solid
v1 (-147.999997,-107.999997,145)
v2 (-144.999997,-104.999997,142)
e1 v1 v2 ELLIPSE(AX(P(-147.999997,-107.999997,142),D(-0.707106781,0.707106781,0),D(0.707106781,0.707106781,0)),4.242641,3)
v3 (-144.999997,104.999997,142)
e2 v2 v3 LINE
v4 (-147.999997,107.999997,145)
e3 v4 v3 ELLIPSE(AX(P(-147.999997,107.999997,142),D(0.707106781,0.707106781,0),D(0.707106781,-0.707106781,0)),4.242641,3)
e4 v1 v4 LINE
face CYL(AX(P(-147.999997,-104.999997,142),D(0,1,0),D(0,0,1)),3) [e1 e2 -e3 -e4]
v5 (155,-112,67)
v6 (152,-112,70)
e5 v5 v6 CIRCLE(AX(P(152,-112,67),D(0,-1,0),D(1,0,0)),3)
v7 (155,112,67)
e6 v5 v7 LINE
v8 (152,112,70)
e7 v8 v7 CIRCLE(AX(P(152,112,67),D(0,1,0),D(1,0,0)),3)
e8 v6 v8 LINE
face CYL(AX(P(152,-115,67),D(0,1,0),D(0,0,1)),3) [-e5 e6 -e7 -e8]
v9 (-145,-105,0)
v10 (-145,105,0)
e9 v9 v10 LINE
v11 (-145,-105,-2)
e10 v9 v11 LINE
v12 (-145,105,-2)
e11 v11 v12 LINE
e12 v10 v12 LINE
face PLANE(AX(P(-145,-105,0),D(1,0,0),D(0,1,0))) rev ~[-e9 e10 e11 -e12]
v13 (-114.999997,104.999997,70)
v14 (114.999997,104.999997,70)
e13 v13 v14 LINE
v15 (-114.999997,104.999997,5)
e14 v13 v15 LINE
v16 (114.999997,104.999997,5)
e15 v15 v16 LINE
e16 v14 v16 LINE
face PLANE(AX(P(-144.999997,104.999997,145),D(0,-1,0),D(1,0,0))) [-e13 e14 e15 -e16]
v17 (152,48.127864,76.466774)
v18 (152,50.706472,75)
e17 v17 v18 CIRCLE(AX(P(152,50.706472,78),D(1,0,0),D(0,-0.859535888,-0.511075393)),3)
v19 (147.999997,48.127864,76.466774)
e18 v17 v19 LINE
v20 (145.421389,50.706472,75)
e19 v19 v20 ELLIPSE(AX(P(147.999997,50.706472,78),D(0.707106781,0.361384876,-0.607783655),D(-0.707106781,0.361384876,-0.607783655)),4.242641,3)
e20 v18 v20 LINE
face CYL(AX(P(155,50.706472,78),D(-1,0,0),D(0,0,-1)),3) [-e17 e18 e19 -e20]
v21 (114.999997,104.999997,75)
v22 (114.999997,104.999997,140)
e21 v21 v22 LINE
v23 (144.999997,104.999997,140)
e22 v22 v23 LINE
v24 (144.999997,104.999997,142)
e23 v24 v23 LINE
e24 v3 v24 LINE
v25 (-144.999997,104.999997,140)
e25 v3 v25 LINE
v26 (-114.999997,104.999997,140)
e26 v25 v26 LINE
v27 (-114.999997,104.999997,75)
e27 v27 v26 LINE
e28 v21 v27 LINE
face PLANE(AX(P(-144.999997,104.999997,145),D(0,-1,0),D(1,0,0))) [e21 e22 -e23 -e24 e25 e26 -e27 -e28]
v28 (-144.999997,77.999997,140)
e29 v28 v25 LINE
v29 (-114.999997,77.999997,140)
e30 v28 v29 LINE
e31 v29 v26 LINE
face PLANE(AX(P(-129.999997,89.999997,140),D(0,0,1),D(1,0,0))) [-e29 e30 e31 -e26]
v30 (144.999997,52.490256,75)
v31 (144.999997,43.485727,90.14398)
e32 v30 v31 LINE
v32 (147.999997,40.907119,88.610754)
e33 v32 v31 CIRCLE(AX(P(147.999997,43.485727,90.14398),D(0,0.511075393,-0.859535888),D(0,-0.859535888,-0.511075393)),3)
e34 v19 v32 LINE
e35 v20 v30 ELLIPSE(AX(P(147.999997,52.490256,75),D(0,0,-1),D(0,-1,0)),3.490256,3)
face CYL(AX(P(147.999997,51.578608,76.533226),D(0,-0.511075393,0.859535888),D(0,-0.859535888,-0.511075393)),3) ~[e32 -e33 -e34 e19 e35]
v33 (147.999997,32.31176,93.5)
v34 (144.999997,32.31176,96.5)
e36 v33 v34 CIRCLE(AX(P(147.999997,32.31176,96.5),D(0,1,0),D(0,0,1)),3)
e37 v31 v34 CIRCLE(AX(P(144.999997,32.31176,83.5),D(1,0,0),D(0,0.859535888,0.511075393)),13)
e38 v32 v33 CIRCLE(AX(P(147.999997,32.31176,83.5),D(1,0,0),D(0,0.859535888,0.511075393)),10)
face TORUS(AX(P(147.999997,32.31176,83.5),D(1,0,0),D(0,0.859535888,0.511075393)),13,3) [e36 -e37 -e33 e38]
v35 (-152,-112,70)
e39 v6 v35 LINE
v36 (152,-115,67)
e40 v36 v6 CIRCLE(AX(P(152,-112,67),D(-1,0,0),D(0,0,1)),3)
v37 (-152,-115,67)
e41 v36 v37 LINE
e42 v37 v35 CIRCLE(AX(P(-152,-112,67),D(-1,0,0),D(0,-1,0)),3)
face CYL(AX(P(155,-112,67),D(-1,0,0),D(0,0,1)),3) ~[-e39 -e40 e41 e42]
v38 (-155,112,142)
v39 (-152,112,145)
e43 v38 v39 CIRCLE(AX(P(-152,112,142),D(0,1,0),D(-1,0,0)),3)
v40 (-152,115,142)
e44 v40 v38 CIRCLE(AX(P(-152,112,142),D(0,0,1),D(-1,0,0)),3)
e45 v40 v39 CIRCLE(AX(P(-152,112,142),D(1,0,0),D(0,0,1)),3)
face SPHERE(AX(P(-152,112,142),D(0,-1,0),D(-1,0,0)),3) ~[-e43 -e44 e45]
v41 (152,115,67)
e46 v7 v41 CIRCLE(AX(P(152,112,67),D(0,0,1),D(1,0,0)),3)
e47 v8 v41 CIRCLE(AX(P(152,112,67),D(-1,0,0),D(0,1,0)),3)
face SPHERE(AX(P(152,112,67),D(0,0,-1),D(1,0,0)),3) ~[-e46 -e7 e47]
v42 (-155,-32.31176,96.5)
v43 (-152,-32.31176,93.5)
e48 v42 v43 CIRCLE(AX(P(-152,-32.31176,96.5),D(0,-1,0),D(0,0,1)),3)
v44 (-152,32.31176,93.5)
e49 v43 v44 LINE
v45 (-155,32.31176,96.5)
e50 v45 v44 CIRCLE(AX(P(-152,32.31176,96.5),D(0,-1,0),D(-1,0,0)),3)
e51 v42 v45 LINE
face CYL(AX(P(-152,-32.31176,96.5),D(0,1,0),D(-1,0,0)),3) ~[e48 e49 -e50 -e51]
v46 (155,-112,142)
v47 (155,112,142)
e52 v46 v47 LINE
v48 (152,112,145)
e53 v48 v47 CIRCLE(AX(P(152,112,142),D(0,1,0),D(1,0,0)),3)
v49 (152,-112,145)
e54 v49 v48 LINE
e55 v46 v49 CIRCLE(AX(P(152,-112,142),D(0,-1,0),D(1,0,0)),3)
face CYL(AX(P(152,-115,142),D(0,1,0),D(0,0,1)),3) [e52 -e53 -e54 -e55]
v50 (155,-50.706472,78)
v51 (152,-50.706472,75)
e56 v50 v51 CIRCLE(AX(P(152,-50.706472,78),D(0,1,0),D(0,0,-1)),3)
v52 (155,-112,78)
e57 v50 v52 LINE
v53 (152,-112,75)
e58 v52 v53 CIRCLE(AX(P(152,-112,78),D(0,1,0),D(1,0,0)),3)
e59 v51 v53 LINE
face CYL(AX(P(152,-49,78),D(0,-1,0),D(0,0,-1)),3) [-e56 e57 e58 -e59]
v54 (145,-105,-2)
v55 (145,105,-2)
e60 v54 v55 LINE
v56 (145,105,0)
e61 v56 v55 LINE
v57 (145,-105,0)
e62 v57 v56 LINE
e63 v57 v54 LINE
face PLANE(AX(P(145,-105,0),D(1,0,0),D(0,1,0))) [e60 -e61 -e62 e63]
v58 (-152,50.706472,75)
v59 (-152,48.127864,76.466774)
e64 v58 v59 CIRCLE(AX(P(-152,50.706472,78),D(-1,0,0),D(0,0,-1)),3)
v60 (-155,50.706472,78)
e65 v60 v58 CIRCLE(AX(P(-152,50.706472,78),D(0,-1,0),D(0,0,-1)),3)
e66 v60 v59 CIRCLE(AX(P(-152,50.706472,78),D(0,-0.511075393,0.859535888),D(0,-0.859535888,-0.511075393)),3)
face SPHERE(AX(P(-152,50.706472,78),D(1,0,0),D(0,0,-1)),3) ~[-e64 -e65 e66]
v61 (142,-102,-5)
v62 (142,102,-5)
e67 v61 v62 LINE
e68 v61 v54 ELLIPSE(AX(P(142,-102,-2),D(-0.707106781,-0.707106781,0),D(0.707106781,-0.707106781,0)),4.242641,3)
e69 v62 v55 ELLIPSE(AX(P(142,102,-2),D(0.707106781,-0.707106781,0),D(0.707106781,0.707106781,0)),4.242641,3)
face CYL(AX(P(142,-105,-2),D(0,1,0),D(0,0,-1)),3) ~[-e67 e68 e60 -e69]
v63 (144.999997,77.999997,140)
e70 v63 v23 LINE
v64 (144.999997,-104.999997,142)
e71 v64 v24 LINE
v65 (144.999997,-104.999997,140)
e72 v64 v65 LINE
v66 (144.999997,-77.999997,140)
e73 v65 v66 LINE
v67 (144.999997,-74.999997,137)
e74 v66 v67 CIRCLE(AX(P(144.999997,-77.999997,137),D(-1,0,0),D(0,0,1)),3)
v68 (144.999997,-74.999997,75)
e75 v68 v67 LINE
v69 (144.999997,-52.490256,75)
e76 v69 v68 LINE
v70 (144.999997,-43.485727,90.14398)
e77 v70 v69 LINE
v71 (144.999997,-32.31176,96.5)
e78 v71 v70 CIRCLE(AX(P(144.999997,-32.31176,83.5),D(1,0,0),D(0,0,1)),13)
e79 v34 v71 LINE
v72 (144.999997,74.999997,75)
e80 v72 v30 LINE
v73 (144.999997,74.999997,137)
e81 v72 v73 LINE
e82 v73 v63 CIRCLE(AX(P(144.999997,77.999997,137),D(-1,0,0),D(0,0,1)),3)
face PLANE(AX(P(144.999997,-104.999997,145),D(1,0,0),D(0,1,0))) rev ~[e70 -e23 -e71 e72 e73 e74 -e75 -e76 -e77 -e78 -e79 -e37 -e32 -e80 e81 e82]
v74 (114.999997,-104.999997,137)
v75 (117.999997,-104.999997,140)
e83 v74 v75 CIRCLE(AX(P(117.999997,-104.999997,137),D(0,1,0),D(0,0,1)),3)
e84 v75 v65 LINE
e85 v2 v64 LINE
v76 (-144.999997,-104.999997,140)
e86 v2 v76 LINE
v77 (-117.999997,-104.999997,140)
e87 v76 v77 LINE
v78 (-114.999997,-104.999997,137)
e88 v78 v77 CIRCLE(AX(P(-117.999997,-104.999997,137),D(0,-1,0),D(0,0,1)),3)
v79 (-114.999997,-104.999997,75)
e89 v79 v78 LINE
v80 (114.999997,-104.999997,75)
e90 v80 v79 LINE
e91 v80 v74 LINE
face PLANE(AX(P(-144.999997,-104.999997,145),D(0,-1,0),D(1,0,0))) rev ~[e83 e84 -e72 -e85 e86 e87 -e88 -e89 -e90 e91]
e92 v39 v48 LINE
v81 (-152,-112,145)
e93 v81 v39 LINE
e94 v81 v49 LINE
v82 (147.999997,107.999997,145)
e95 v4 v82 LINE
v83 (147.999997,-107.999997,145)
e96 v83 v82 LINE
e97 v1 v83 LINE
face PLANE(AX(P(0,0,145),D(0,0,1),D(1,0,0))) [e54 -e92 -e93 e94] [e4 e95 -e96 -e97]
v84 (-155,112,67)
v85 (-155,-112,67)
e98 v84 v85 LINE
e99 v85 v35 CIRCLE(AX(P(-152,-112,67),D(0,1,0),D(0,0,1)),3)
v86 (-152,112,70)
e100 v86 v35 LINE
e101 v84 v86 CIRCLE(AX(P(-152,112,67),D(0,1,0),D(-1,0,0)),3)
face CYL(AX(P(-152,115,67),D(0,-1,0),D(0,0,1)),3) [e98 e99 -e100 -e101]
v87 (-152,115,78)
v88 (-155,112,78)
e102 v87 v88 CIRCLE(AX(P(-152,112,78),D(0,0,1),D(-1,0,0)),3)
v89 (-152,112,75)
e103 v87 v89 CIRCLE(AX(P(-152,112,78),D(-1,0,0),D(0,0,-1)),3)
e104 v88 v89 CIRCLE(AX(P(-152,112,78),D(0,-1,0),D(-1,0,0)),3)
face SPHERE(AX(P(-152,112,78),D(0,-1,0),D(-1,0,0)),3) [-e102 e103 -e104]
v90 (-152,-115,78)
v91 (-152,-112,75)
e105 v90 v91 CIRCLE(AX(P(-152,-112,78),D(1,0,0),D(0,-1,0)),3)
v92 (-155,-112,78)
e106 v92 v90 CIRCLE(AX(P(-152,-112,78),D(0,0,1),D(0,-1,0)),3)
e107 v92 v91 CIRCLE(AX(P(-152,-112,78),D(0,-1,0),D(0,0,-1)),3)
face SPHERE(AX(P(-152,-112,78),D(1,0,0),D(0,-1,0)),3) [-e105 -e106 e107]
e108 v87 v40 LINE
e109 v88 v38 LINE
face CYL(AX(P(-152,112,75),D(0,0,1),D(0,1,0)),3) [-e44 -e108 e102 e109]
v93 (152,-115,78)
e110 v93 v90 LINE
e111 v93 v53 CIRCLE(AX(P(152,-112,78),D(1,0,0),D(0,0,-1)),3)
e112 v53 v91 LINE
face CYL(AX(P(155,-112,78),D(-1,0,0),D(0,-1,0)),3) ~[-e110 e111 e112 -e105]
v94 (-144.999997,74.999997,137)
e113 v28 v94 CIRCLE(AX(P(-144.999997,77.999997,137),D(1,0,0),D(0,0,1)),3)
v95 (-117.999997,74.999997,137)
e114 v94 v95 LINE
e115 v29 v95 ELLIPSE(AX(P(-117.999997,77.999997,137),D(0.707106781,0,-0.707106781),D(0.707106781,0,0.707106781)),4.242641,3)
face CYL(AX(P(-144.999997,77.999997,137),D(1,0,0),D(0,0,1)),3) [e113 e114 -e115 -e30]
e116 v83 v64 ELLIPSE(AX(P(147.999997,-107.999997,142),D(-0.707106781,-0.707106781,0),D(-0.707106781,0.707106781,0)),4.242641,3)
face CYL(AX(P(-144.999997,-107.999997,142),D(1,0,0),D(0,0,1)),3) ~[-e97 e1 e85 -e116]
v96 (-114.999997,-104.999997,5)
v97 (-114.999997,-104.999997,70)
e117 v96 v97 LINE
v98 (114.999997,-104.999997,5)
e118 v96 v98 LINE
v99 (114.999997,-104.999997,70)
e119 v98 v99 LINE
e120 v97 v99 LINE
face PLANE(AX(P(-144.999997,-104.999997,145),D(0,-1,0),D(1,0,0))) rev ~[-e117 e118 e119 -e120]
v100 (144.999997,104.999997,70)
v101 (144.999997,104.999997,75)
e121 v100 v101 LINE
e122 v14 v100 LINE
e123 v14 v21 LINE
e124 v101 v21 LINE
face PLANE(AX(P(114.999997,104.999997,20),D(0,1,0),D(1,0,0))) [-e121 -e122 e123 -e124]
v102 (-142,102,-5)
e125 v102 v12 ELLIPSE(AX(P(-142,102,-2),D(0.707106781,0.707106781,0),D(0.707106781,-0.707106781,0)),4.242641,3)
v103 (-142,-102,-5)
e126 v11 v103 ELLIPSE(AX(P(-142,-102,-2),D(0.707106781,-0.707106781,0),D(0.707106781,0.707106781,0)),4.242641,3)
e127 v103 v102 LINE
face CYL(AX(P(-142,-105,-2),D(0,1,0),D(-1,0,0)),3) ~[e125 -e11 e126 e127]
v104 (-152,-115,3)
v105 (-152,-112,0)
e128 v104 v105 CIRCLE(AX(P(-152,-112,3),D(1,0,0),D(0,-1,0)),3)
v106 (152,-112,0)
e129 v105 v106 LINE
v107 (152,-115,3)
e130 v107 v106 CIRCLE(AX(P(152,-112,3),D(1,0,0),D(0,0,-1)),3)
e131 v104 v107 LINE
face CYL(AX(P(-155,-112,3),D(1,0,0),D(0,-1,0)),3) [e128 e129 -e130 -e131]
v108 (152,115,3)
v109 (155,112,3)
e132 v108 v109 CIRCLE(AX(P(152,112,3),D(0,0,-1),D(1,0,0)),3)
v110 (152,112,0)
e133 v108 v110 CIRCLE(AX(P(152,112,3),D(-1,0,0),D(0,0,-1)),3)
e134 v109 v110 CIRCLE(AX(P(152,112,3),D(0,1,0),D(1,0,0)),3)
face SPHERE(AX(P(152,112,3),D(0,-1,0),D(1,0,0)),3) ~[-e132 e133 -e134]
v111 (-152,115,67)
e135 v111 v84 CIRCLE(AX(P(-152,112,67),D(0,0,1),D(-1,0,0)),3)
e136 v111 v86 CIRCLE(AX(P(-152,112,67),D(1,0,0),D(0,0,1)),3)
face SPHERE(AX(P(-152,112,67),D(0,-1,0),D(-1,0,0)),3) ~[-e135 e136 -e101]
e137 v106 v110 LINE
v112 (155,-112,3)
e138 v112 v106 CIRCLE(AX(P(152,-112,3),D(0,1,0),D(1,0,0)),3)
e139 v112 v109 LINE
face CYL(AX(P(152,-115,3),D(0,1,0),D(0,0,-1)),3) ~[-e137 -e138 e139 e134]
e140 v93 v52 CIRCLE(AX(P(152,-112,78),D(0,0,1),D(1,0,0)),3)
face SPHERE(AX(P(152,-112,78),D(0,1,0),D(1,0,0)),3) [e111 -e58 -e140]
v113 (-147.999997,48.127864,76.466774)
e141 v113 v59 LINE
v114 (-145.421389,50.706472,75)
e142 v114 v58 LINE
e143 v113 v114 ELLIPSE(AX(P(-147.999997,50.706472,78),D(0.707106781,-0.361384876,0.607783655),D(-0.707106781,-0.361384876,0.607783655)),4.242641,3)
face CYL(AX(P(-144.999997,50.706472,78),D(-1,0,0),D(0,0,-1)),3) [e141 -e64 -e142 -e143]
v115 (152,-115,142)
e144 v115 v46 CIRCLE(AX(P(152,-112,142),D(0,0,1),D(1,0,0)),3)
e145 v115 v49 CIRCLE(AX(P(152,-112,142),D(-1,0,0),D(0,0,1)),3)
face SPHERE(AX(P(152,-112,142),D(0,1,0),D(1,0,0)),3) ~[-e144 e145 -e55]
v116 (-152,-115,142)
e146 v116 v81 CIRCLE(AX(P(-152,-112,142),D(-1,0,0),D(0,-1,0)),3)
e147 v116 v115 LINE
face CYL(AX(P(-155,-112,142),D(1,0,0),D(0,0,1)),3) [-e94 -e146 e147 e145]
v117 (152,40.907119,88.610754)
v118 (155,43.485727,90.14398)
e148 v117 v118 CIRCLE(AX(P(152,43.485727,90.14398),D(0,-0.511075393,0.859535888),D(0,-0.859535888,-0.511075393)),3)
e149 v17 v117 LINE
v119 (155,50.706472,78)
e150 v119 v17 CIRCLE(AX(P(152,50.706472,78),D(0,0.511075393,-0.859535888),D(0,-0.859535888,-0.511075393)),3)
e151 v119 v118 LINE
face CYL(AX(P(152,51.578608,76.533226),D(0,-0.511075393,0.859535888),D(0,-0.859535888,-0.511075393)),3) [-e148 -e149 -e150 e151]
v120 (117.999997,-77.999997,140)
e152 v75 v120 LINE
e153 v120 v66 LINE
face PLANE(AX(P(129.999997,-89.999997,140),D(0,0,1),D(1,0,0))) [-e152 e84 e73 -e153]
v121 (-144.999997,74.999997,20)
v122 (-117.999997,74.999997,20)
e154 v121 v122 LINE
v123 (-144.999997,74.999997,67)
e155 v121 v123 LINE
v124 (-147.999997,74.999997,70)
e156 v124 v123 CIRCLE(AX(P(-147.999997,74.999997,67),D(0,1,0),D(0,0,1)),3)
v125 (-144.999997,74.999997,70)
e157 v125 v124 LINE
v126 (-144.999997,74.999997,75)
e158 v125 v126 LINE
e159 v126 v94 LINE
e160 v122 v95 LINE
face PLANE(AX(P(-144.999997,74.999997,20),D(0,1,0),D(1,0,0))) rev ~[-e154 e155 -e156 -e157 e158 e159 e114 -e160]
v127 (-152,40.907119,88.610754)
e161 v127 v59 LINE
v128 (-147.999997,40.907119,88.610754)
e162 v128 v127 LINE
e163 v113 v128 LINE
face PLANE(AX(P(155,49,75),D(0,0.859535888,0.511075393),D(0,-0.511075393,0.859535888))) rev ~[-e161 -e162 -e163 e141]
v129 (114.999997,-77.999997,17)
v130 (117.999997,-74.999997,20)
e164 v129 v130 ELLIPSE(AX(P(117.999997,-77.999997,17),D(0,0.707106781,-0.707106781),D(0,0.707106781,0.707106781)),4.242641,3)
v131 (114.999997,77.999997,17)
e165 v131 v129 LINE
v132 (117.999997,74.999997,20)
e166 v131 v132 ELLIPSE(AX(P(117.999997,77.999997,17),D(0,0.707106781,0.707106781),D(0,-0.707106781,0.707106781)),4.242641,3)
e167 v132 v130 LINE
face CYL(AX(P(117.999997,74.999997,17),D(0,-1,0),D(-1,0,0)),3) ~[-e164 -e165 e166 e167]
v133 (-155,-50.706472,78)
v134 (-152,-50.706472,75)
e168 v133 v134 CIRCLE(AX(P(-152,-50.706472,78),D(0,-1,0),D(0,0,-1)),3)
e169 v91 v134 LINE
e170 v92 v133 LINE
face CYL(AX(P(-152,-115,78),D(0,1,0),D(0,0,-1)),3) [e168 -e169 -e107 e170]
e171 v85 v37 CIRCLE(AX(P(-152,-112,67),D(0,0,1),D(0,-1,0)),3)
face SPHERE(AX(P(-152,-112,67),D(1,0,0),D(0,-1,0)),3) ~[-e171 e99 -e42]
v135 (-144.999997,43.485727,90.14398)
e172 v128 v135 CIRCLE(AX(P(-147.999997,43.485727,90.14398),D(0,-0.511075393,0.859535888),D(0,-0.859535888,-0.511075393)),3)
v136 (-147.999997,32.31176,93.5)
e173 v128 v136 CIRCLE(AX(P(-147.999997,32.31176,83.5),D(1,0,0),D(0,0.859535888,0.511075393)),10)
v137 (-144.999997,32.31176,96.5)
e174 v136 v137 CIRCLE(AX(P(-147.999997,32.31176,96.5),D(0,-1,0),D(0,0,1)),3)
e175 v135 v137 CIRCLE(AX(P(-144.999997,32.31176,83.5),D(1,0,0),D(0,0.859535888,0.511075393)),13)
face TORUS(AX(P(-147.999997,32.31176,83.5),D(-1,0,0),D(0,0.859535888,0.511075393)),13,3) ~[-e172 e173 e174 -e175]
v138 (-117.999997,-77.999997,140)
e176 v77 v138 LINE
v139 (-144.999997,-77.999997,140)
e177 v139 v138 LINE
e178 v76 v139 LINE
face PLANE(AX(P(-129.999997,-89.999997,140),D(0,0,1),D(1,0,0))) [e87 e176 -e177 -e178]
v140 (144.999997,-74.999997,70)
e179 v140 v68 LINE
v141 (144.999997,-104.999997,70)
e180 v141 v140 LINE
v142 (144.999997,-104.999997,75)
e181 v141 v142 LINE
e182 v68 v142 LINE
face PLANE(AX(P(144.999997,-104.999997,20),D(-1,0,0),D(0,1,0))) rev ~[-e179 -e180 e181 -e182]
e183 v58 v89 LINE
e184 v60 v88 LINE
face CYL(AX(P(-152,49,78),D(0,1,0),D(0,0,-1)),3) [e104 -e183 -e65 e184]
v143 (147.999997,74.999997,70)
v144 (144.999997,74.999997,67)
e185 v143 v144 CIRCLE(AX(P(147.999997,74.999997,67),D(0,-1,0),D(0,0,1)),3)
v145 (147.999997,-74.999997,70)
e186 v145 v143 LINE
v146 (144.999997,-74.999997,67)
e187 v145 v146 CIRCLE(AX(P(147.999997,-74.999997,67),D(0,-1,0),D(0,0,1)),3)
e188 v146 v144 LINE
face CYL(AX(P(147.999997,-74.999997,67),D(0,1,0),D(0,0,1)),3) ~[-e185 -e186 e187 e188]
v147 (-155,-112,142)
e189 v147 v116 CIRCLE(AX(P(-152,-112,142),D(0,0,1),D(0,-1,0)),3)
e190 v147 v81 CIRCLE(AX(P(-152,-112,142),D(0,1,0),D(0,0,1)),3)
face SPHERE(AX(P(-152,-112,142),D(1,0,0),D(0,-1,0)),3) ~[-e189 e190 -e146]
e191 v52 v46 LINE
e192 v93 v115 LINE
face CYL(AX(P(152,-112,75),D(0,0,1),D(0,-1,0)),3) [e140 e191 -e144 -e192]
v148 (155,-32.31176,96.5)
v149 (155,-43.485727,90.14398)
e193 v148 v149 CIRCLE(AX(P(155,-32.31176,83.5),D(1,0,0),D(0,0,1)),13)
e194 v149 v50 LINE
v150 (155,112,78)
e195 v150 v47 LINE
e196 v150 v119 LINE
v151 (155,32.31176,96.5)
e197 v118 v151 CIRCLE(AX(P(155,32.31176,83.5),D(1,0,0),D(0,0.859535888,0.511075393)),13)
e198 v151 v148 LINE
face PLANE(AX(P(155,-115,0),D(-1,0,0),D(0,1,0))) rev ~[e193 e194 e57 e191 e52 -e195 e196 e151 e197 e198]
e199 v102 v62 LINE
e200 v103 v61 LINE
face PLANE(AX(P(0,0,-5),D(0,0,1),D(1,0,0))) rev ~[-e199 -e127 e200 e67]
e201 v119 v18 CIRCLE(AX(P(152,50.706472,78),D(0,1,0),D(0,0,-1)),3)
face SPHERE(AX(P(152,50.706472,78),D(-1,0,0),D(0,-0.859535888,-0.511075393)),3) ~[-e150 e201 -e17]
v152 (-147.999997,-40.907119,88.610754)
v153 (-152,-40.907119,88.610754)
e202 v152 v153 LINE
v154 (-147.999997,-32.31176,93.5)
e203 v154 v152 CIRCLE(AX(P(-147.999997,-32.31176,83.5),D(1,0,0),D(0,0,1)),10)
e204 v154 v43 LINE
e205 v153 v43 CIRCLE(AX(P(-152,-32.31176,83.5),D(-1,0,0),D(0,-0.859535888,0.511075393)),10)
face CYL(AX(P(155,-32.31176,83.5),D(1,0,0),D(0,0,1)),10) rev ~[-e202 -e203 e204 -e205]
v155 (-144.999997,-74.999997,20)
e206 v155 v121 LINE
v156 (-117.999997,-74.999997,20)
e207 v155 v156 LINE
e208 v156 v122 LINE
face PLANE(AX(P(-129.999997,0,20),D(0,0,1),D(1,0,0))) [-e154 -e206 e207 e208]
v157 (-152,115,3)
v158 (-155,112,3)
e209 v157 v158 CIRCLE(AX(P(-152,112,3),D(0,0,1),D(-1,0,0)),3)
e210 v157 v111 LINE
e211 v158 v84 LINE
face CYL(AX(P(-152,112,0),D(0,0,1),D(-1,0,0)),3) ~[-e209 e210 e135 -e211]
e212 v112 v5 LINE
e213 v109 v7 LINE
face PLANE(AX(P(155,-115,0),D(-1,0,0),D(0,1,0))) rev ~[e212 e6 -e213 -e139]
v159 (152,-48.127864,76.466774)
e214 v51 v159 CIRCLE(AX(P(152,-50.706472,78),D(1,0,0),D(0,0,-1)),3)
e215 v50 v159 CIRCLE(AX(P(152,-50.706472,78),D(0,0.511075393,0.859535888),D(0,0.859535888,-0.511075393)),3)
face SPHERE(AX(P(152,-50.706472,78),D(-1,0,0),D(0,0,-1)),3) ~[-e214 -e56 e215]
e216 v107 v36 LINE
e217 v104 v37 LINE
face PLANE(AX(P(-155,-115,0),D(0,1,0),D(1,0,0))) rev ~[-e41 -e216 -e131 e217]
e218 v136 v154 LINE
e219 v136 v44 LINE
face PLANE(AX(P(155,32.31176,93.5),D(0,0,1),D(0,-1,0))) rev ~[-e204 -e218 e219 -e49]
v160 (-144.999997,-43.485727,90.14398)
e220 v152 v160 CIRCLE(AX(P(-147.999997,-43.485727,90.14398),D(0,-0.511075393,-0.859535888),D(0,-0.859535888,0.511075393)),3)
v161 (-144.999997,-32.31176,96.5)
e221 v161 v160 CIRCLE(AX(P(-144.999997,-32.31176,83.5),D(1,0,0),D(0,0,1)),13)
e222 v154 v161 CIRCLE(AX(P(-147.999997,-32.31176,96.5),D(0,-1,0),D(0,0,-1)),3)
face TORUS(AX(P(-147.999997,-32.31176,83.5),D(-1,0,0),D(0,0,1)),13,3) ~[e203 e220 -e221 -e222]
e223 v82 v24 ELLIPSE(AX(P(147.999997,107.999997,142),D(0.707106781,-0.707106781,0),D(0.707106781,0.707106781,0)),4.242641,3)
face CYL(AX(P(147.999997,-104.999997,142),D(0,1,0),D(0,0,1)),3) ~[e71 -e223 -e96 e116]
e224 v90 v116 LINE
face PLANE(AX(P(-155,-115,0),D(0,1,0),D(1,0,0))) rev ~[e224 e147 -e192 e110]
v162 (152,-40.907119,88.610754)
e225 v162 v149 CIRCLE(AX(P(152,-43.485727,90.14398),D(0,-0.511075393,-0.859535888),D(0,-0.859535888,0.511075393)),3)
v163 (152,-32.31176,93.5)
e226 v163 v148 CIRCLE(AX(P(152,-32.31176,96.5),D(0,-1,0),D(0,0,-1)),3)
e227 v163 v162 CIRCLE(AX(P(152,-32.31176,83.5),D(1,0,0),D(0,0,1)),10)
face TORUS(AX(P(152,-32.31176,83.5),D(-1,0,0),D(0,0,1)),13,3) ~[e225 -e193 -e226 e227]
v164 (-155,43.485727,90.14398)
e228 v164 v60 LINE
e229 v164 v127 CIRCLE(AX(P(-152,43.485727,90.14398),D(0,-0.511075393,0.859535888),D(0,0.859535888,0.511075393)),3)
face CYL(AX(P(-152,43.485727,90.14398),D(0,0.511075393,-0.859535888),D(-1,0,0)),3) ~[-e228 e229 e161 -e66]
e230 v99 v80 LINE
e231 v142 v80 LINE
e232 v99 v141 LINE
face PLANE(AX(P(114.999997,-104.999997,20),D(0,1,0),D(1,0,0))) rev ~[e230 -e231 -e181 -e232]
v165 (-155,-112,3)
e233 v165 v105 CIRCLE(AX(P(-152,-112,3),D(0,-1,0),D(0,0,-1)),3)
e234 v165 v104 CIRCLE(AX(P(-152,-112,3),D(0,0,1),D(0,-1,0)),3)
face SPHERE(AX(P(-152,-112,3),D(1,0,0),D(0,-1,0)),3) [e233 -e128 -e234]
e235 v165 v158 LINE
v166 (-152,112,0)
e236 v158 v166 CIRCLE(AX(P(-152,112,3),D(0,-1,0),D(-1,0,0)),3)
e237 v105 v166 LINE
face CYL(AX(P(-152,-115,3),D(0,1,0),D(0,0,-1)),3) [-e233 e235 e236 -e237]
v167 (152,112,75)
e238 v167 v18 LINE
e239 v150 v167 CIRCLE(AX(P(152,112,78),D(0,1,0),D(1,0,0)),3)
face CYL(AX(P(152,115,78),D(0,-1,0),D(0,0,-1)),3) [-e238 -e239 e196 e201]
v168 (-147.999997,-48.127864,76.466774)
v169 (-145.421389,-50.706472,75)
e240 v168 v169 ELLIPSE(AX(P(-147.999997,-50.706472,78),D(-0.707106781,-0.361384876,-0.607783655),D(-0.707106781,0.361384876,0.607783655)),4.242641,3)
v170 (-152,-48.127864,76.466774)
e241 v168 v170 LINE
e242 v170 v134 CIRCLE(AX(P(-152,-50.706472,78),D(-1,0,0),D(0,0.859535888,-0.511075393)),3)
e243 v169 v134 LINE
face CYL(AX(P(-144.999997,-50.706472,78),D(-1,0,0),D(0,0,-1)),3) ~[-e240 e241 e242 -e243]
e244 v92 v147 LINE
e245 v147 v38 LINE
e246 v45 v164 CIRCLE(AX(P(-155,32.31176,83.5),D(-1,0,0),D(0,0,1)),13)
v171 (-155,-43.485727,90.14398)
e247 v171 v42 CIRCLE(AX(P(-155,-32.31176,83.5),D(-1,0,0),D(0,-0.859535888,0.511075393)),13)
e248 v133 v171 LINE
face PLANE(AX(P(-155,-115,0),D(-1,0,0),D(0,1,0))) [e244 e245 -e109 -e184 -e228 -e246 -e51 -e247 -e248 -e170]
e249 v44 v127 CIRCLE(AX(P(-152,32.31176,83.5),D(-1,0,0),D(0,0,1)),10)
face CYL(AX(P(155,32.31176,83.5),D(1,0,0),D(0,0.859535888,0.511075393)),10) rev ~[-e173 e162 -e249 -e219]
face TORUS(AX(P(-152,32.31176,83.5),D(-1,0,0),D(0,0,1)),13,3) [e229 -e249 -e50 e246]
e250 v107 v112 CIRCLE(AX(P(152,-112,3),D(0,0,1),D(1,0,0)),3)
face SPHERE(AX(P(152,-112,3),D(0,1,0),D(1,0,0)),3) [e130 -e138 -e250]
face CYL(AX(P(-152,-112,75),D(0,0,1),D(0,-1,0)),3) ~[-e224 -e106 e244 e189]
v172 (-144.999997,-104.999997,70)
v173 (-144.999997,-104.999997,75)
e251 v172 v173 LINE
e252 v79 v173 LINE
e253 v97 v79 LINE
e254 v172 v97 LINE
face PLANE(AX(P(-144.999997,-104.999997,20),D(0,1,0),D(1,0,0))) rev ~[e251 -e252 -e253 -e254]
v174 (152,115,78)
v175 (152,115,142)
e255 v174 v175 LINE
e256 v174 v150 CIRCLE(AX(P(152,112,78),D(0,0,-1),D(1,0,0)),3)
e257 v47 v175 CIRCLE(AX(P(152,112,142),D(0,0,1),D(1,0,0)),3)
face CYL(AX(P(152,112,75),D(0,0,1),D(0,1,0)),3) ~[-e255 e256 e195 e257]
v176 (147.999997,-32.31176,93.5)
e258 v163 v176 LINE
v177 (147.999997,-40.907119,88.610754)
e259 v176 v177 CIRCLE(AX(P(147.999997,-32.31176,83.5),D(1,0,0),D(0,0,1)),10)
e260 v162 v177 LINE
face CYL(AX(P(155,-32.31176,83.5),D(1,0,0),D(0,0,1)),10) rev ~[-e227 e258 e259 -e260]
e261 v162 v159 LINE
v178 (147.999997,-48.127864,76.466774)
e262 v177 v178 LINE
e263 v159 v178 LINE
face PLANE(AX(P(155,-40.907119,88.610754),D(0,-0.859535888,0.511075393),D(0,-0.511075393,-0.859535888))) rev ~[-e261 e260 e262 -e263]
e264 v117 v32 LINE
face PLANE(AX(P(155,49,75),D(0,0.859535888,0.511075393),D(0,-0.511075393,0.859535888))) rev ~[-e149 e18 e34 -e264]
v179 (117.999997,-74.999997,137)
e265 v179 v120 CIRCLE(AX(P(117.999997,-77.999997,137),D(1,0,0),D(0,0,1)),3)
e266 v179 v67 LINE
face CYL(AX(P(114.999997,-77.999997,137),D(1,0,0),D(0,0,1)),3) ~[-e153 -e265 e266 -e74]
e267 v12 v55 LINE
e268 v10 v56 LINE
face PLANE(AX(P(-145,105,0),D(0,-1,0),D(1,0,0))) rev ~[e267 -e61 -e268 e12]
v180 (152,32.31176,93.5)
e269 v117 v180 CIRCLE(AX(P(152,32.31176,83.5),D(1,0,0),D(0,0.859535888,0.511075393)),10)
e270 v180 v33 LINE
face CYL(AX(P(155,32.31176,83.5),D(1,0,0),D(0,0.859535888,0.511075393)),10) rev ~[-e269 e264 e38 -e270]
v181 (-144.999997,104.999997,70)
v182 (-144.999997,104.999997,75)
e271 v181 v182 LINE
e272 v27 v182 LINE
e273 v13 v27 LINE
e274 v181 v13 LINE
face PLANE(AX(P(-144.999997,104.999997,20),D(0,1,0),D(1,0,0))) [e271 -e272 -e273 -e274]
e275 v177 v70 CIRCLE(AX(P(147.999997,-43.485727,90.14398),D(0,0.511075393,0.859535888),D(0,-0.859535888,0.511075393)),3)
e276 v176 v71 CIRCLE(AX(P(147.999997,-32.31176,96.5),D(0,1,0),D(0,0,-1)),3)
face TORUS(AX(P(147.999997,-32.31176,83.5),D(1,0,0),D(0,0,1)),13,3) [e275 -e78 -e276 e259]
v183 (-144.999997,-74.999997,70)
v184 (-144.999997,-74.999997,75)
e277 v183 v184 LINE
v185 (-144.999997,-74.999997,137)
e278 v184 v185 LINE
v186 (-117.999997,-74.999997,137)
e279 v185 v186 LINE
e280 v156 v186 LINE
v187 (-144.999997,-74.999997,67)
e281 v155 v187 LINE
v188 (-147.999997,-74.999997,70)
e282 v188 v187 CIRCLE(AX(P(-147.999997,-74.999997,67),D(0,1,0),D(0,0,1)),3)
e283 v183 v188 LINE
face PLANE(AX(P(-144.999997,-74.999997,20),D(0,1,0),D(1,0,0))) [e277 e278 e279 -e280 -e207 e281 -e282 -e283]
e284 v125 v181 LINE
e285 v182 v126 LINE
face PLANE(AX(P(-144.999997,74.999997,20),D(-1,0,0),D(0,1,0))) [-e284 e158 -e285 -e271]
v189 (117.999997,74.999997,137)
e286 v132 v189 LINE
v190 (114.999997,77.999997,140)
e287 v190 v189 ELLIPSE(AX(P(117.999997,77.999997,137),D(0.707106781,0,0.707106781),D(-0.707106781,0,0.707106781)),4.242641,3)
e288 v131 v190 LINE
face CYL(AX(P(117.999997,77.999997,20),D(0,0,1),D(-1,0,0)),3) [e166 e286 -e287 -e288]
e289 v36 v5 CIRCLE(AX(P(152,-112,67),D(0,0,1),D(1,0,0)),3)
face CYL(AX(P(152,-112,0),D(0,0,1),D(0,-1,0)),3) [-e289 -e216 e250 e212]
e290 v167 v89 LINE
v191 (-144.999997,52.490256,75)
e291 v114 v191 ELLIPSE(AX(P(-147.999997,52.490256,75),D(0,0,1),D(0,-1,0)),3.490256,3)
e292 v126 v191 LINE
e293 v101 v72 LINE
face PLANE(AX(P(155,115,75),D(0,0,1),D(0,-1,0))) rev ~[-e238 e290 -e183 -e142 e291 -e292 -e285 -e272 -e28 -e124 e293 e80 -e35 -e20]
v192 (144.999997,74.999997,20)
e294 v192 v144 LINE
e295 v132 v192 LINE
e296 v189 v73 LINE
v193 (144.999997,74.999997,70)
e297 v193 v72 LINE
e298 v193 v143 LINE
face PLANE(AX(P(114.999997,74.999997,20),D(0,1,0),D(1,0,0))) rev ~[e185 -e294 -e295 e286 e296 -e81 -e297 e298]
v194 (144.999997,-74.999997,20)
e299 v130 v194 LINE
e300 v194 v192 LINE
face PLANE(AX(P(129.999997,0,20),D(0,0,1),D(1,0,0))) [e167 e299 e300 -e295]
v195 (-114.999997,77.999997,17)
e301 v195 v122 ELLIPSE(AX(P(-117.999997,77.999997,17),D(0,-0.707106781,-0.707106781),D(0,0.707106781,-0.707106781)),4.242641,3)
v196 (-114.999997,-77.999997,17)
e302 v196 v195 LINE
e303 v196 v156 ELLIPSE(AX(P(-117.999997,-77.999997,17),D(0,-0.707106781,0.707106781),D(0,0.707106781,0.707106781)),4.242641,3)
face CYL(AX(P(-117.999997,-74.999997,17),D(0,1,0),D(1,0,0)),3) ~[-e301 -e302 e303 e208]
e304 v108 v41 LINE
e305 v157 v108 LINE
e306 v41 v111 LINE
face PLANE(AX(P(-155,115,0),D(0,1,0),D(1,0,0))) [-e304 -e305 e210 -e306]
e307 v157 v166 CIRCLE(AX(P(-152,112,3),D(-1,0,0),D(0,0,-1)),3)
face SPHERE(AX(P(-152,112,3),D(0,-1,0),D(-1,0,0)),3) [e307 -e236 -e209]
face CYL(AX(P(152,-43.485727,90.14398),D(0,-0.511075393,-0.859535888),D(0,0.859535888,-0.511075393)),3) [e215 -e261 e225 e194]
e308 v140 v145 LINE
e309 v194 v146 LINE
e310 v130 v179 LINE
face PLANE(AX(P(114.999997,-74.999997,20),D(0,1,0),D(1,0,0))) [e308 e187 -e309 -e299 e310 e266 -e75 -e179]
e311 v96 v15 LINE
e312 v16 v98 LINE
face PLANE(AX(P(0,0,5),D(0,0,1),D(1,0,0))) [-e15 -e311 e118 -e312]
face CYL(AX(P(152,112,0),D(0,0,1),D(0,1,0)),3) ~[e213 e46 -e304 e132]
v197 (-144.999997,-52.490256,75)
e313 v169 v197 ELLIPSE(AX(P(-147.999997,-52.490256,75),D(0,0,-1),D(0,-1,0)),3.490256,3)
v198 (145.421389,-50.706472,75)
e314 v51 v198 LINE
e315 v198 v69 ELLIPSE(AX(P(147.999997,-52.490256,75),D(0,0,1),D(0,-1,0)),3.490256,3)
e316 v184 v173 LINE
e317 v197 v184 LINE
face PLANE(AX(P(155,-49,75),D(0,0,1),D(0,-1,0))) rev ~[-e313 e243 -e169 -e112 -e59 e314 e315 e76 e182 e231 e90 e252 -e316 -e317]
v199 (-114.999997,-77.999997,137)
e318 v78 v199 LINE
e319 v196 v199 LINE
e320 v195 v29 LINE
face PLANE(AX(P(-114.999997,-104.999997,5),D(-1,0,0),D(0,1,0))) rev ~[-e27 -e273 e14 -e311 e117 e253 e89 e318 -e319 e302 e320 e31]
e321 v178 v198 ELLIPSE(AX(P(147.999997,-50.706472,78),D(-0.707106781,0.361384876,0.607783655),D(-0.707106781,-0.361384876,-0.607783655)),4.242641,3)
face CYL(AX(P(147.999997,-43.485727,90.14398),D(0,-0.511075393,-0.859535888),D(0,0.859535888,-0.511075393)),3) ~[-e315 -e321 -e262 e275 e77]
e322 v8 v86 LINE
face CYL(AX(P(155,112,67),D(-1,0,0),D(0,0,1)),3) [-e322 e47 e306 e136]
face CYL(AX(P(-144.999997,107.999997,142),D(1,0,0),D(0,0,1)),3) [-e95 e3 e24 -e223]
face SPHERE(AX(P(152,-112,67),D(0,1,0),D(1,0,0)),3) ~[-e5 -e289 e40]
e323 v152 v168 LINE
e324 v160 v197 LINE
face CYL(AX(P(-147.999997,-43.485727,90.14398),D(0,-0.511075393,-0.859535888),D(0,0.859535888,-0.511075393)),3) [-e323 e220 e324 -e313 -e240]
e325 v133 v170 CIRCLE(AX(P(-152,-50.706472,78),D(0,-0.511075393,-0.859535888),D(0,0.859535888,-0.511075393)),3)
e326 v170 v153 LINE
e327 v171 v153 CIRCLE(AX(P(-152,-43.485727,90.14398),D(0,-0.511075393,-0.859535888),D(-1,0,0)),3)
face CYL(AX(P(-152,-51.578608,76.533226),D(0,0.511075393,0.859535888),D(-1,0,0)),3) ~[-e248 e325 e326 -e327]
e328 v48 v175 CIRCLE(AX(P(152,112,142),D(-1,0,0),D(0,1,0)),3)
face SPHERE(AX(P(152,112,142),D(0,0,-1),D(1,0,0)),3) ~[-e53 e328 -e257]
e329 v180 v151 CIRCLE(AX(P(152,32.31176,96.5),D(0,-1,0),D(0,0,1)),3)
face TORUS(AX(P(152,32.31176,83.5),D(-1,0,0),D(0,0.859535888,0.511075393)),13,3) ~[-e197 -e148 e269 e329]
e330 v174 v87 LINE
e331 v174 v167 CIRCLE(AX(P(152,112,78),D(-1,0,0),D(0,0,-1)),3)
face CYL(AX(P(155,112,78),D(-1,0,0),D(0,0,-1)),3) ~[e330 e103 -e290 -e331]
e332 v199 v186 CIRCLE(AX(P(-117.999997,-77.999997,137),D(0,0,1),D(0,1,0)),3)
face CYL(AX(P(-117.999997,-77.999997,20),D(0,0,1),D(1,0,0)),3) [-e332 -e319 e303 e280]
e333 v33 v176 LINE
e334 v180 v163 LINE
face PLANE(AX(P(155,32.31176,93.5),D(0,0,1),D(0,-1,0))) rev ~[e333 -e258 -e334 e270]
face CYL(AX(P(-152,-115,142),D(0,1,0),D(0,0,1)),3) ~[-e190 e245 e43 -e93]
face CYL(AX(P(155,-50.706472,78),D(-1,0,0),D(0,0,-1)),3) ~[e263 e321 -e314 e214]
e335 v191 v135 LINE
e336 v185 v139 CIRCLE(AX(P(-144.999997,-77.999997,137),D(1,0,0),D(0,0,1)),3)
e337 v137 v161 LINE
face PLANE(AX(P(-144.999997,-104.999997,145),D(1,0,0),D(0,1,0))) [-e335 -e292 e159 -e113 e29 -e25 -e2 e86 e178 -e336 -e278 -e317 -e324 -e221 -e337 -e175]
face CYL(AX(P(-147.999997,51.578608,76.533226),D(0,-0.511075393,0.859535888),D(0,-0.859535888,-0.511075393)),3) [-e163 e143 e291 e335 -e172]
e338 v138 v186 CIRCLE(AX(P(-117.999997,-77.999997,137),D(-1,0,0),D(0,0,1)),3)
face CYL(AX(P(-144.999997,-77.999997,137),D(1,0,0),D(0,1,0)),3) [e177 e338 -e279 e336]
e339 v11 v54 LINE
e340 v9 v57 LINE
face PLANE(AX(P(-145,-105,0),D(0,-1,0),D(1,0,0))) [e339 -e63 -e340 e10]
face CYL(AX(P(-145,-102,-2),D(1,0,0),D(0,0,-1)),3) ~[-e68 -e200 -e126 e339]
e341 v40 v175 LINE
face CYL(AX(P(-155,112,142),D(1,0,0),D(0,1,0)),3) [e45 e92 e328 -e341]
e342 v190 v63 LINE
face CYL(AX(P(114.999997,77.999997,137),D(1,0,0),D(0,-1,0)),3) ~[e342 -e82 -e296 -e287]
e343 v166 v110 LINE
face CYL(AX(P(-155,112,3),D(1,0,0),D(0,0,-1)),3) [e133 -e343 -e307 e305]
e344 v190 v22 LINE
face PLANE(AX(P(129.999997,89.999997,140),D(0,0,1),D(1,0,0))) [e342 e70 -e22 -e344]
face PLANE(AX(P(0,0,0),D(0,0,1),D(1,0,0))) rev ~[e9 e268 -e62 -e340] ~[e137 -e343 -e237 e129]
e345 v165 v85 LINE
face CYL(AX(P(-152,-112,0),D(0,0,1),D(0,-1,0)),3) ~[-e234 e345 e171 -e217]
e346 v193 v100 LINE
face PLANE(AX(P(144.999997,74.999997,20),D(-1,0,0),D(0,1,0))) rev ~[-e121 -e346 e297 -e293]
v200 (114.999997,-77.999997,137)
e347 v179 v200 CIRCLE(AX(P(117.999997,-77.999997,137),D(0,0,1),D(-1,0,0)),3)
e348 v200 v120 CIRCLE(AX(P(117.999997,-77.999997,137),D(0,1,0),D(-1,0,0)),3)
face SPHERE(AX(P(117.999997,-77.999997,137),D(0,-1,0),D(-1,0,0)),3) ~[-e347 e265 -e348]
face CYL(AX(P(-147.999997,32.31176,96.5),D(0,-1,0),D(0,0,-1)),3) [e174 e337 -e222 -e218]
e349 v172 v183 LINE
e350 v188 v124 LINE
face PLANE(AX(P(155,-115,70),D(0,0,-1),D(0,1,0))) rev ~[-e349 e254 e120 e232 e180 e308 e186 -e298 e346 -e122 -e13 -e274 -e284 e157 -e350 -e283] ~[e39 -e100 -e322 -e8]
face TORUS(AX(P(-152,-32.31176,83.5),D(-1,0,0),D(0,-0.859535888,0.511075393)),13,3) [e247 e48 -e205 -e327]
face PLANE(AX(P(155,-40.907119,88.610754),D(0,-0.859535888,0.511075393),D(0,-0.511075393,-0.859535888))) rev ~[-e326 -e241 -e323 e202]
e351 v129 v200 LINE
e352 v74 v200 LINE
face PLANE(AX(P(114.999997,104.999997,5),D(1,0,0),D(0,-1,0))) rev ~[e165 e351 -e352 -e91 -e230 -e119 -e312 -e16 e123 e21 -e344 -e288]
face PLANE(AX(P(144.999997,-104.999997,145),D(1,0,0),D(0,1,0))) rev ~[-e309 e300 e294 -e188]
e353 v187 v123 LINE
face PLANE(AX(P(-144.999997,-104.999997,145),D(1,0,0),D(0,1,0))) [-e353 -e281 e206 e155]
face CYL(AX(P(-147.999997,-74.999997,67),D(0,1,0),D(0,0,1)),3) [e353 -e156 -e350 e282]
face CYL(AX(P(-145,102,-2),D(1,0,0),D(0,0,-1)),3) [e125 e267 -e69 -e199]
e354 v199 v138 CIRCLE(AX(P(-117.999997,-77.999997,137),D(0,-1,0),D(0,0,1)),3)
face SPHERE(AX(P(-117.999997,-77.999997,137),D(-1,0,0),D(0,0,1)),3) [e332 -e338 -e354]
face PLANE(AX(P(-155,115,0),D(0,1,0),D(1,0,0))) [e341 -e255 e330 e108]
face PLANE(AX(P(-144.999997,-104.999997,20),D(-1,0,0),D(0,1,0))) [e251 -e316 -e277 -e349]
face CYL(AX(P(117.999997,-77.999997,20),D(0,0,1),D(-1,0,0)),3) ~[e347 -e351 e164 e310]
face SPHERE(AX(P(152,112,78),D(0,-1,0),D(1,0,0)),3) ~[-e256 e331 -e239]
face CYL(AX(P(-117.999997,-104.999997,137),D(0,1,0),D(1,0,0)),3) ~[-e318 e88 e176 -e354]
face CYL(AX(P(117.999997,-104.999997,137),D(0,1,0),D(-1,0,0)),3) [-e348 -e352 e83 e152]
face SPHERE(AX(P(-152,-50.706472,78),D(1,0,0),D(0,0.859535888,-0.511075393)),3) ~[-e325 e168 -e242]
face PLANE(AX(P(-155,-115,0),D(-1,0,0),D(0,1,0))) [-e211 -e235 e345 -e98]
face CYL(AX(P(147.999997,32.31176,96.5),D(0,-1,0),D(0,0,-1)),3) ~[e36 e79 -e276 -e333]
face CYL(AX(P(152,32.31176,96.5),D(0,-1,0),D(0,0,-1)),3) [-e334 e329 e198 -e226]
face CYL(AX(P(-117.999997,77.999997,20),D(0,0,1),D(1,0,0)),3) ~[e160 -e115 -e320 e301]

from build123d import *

# Parameters (mm, degrees)
F0_W      = 310
F0_H      = 230
F2_DEPTH  = 145
F1_W      = 290
F1_H      = 210
F3_DEPTH  = 5
F4_W      = 289.9999934435
F4_H      = 209.9999934435
F5_DEPTH  = 140
F7_DEPTH  = 310.001
F9_START  = 15
F8_W      = 30
F8_H      = 30
F9_DEPTH  = 120
F10_W     = 30
F10_H     = 209.9999934435
F11_DEPTH = 15
F12_R     = 3


with BuildPart() as f2:
    # F0 (on Top) → F2 (new body)
    with BuildSketch(Plane.XY):
        Rectangle(F0_W, F0_H)
    extrude(amount=F2_DEPTH)

    # F1 (on face) → F3 (join)
    with BuildSketch(Plane.XY):
        Rectangle(F1_W, F1_H)
    extrude(amount=-F3_DEPTH)

    # F4 (on face) → F5 (cut)
    with BuildSketch(Plane.XY.offset(145)):
        Rectangle(F4_W, F4_H)
    extrude(amount=-F5_DEPTH, mode=Mode.SUBTRACT)

    # F6 (on face) → F7 (cut, through all)
    with BuildSketch(Plane.YZ.offset(155)):
        with BuildLine():
            Line((-49, 75), (-115, 75))
            Line((-115, 75), (-115, 70))
            Line((-115, 70), (115, 70))
            Line((115, 70), (115, 75))
            Line((115, 75), (49, 75))
            Line((49, 75), (40.9071192856, 88.6107539288))
            ThreePointArc((40.9071192856, 88.6107539288), (37.256073336, 92.1921671431), (32.3117604054, 93.5))
            Line((32.3117604054, 93.5), (-32.3117604054, 93.5))
            ThreePointArc((-32.3117604054, 93.5), (-37.256073336, 92.1921671431), (-40.9071192856, 88.6107539288))
            Line((-40.9071192856, 88.6107539288), (-49, 75))
        make_face()
    extrude(amount=-F7_DEPTH, mode=Mode.SUBTRACT)

    # F8 (on face) → F9 (join)
    with BuildSketch(Plane.XY.offset(5).offset(F9_START)):
        with Locations((-129.9999967217, 89.9999967217)):
            Rectangle(F8_W, F8_H)
        with Locations((129.9999967217, 89.9999967217)):
            Rectangle(F8_W, F8_H)
        with Locations((129.9999967217, -89.9999967217)):
            Rectangle(F8_W, F8_H)
        with Locations((-129.9999967217, -89.9999967217)):
            Rectangle(F8_W, F8_H)
    extrude(amount=F9_DEPTH)

    # F10 (on face) → F11 (join)
    with BuildSketch(Plane.XY.offset(5)):
        Polygon((114.9999967217, -74.9999967217), (114.9999967217, -104.9999967217), (144.9999967217, -104.9999967217), (144.9999967217, 104.9999967217), (114.9999967217, 104.9999967217), align=None)
        with Locations((-129.9999967217, 0)):
            Rectangle(F10_W, F10_H)
    extrude(amount=F11_DEPTH)

    # F12
    f12_edges = [f2.edges().sort_by_distance(p)[0] for p in [
        (155, 0, 0),
        (155, 115, 35),
        (155, 0, 70),
        (155, -115, 35),
        (155, -82, 75),
        (155, -44.95356, 81.805377),
        (155, -37.256073, 92.192167),
        (155, 0, 93.5),
        (155, 37.256073, 92.192167),
        (155, 44.95356, 81.805377),
        (155, 82, 75),
        (155, 115, 110),
        (155, 0, 145),
        (155, -115, 110),
        (0, -115, 0),
        (0, -115, 70),
        (-155, -115, 35),
        (0, -115, 75),
        (0, -115, 145),
        (-155, -115, 110),
        (-155, 82, 75),
        (-155, 44.95356, 81.805377),
        (-155, 37.256073, 92.192167),
        (-155, 0, 93.5),
        (-155, -37.256073, 92.192167),
        (-155, -44.95356, 81.805377),
        (-155, -82, 75),
        (-155, 0, 145),
        (-155, 115, 110),
        (-155, 0, 0),
        (-155, 0, 70),
        (-155, 115, 35),
        (0, 115, 0),
        (0, 115, 70),
        (0, 115, 75),
        (0, 115, 145),
        (0, 104.999997, 145),
        (144.999997, 0, 145),
        (0, -104.999997, 145),
        (-144.999997, 0, 145),
        (-129.999997, -74.999997, 140),
        (-114.999997, -89.999997, 140),
        (-114.999997, -74.999997, 80),
        (114.999997, -89.999997, 140),
        (114.999997, -74.999997, 80),
        (129.999997, -74.999997, 140),
        (114.999997, 0, 20),
        (114.999997, 74.999997, 80),
        (129.999997, 74.999997, 140),
        (-114.999997, 0, 20),
        (-114.999997, 74.999997, 80),
        (-129.999997, 74.999997, 140),
        (144.999997, 0, 70),
        (-144.999997, 0, 70),
        (-144.999997, 37.256073, 92.192167),
        (144.999997, 37.256073, 92.192167),
        (149.999998, -49, 75),
        (149.999998, 49, 75),
        (0, 105, -5),
        (-145, 0, -5),
        (0, -105, -5),
        (145, 0, -5),
        (-149.999998, -49, 75),
        (-149.999998, 49, 75),
        (144.999997, 44.95356, 81.805377),
        (144.999997, 0, 93.5),
        (144.999997, -37.256073, 92.192167),
        (144.999997, -44.95356, 81.805377),
        (-144.999997, -44.95356, 81.805377),
        (-144.999997, -37.256073, 92.192167),
        (-144.999997, 0, 93.5),
        (-144.999997, 44.95356, 81.805377),
    ]]
    fillet(f12_edges, radius=F12_R)


solid = f2.part
